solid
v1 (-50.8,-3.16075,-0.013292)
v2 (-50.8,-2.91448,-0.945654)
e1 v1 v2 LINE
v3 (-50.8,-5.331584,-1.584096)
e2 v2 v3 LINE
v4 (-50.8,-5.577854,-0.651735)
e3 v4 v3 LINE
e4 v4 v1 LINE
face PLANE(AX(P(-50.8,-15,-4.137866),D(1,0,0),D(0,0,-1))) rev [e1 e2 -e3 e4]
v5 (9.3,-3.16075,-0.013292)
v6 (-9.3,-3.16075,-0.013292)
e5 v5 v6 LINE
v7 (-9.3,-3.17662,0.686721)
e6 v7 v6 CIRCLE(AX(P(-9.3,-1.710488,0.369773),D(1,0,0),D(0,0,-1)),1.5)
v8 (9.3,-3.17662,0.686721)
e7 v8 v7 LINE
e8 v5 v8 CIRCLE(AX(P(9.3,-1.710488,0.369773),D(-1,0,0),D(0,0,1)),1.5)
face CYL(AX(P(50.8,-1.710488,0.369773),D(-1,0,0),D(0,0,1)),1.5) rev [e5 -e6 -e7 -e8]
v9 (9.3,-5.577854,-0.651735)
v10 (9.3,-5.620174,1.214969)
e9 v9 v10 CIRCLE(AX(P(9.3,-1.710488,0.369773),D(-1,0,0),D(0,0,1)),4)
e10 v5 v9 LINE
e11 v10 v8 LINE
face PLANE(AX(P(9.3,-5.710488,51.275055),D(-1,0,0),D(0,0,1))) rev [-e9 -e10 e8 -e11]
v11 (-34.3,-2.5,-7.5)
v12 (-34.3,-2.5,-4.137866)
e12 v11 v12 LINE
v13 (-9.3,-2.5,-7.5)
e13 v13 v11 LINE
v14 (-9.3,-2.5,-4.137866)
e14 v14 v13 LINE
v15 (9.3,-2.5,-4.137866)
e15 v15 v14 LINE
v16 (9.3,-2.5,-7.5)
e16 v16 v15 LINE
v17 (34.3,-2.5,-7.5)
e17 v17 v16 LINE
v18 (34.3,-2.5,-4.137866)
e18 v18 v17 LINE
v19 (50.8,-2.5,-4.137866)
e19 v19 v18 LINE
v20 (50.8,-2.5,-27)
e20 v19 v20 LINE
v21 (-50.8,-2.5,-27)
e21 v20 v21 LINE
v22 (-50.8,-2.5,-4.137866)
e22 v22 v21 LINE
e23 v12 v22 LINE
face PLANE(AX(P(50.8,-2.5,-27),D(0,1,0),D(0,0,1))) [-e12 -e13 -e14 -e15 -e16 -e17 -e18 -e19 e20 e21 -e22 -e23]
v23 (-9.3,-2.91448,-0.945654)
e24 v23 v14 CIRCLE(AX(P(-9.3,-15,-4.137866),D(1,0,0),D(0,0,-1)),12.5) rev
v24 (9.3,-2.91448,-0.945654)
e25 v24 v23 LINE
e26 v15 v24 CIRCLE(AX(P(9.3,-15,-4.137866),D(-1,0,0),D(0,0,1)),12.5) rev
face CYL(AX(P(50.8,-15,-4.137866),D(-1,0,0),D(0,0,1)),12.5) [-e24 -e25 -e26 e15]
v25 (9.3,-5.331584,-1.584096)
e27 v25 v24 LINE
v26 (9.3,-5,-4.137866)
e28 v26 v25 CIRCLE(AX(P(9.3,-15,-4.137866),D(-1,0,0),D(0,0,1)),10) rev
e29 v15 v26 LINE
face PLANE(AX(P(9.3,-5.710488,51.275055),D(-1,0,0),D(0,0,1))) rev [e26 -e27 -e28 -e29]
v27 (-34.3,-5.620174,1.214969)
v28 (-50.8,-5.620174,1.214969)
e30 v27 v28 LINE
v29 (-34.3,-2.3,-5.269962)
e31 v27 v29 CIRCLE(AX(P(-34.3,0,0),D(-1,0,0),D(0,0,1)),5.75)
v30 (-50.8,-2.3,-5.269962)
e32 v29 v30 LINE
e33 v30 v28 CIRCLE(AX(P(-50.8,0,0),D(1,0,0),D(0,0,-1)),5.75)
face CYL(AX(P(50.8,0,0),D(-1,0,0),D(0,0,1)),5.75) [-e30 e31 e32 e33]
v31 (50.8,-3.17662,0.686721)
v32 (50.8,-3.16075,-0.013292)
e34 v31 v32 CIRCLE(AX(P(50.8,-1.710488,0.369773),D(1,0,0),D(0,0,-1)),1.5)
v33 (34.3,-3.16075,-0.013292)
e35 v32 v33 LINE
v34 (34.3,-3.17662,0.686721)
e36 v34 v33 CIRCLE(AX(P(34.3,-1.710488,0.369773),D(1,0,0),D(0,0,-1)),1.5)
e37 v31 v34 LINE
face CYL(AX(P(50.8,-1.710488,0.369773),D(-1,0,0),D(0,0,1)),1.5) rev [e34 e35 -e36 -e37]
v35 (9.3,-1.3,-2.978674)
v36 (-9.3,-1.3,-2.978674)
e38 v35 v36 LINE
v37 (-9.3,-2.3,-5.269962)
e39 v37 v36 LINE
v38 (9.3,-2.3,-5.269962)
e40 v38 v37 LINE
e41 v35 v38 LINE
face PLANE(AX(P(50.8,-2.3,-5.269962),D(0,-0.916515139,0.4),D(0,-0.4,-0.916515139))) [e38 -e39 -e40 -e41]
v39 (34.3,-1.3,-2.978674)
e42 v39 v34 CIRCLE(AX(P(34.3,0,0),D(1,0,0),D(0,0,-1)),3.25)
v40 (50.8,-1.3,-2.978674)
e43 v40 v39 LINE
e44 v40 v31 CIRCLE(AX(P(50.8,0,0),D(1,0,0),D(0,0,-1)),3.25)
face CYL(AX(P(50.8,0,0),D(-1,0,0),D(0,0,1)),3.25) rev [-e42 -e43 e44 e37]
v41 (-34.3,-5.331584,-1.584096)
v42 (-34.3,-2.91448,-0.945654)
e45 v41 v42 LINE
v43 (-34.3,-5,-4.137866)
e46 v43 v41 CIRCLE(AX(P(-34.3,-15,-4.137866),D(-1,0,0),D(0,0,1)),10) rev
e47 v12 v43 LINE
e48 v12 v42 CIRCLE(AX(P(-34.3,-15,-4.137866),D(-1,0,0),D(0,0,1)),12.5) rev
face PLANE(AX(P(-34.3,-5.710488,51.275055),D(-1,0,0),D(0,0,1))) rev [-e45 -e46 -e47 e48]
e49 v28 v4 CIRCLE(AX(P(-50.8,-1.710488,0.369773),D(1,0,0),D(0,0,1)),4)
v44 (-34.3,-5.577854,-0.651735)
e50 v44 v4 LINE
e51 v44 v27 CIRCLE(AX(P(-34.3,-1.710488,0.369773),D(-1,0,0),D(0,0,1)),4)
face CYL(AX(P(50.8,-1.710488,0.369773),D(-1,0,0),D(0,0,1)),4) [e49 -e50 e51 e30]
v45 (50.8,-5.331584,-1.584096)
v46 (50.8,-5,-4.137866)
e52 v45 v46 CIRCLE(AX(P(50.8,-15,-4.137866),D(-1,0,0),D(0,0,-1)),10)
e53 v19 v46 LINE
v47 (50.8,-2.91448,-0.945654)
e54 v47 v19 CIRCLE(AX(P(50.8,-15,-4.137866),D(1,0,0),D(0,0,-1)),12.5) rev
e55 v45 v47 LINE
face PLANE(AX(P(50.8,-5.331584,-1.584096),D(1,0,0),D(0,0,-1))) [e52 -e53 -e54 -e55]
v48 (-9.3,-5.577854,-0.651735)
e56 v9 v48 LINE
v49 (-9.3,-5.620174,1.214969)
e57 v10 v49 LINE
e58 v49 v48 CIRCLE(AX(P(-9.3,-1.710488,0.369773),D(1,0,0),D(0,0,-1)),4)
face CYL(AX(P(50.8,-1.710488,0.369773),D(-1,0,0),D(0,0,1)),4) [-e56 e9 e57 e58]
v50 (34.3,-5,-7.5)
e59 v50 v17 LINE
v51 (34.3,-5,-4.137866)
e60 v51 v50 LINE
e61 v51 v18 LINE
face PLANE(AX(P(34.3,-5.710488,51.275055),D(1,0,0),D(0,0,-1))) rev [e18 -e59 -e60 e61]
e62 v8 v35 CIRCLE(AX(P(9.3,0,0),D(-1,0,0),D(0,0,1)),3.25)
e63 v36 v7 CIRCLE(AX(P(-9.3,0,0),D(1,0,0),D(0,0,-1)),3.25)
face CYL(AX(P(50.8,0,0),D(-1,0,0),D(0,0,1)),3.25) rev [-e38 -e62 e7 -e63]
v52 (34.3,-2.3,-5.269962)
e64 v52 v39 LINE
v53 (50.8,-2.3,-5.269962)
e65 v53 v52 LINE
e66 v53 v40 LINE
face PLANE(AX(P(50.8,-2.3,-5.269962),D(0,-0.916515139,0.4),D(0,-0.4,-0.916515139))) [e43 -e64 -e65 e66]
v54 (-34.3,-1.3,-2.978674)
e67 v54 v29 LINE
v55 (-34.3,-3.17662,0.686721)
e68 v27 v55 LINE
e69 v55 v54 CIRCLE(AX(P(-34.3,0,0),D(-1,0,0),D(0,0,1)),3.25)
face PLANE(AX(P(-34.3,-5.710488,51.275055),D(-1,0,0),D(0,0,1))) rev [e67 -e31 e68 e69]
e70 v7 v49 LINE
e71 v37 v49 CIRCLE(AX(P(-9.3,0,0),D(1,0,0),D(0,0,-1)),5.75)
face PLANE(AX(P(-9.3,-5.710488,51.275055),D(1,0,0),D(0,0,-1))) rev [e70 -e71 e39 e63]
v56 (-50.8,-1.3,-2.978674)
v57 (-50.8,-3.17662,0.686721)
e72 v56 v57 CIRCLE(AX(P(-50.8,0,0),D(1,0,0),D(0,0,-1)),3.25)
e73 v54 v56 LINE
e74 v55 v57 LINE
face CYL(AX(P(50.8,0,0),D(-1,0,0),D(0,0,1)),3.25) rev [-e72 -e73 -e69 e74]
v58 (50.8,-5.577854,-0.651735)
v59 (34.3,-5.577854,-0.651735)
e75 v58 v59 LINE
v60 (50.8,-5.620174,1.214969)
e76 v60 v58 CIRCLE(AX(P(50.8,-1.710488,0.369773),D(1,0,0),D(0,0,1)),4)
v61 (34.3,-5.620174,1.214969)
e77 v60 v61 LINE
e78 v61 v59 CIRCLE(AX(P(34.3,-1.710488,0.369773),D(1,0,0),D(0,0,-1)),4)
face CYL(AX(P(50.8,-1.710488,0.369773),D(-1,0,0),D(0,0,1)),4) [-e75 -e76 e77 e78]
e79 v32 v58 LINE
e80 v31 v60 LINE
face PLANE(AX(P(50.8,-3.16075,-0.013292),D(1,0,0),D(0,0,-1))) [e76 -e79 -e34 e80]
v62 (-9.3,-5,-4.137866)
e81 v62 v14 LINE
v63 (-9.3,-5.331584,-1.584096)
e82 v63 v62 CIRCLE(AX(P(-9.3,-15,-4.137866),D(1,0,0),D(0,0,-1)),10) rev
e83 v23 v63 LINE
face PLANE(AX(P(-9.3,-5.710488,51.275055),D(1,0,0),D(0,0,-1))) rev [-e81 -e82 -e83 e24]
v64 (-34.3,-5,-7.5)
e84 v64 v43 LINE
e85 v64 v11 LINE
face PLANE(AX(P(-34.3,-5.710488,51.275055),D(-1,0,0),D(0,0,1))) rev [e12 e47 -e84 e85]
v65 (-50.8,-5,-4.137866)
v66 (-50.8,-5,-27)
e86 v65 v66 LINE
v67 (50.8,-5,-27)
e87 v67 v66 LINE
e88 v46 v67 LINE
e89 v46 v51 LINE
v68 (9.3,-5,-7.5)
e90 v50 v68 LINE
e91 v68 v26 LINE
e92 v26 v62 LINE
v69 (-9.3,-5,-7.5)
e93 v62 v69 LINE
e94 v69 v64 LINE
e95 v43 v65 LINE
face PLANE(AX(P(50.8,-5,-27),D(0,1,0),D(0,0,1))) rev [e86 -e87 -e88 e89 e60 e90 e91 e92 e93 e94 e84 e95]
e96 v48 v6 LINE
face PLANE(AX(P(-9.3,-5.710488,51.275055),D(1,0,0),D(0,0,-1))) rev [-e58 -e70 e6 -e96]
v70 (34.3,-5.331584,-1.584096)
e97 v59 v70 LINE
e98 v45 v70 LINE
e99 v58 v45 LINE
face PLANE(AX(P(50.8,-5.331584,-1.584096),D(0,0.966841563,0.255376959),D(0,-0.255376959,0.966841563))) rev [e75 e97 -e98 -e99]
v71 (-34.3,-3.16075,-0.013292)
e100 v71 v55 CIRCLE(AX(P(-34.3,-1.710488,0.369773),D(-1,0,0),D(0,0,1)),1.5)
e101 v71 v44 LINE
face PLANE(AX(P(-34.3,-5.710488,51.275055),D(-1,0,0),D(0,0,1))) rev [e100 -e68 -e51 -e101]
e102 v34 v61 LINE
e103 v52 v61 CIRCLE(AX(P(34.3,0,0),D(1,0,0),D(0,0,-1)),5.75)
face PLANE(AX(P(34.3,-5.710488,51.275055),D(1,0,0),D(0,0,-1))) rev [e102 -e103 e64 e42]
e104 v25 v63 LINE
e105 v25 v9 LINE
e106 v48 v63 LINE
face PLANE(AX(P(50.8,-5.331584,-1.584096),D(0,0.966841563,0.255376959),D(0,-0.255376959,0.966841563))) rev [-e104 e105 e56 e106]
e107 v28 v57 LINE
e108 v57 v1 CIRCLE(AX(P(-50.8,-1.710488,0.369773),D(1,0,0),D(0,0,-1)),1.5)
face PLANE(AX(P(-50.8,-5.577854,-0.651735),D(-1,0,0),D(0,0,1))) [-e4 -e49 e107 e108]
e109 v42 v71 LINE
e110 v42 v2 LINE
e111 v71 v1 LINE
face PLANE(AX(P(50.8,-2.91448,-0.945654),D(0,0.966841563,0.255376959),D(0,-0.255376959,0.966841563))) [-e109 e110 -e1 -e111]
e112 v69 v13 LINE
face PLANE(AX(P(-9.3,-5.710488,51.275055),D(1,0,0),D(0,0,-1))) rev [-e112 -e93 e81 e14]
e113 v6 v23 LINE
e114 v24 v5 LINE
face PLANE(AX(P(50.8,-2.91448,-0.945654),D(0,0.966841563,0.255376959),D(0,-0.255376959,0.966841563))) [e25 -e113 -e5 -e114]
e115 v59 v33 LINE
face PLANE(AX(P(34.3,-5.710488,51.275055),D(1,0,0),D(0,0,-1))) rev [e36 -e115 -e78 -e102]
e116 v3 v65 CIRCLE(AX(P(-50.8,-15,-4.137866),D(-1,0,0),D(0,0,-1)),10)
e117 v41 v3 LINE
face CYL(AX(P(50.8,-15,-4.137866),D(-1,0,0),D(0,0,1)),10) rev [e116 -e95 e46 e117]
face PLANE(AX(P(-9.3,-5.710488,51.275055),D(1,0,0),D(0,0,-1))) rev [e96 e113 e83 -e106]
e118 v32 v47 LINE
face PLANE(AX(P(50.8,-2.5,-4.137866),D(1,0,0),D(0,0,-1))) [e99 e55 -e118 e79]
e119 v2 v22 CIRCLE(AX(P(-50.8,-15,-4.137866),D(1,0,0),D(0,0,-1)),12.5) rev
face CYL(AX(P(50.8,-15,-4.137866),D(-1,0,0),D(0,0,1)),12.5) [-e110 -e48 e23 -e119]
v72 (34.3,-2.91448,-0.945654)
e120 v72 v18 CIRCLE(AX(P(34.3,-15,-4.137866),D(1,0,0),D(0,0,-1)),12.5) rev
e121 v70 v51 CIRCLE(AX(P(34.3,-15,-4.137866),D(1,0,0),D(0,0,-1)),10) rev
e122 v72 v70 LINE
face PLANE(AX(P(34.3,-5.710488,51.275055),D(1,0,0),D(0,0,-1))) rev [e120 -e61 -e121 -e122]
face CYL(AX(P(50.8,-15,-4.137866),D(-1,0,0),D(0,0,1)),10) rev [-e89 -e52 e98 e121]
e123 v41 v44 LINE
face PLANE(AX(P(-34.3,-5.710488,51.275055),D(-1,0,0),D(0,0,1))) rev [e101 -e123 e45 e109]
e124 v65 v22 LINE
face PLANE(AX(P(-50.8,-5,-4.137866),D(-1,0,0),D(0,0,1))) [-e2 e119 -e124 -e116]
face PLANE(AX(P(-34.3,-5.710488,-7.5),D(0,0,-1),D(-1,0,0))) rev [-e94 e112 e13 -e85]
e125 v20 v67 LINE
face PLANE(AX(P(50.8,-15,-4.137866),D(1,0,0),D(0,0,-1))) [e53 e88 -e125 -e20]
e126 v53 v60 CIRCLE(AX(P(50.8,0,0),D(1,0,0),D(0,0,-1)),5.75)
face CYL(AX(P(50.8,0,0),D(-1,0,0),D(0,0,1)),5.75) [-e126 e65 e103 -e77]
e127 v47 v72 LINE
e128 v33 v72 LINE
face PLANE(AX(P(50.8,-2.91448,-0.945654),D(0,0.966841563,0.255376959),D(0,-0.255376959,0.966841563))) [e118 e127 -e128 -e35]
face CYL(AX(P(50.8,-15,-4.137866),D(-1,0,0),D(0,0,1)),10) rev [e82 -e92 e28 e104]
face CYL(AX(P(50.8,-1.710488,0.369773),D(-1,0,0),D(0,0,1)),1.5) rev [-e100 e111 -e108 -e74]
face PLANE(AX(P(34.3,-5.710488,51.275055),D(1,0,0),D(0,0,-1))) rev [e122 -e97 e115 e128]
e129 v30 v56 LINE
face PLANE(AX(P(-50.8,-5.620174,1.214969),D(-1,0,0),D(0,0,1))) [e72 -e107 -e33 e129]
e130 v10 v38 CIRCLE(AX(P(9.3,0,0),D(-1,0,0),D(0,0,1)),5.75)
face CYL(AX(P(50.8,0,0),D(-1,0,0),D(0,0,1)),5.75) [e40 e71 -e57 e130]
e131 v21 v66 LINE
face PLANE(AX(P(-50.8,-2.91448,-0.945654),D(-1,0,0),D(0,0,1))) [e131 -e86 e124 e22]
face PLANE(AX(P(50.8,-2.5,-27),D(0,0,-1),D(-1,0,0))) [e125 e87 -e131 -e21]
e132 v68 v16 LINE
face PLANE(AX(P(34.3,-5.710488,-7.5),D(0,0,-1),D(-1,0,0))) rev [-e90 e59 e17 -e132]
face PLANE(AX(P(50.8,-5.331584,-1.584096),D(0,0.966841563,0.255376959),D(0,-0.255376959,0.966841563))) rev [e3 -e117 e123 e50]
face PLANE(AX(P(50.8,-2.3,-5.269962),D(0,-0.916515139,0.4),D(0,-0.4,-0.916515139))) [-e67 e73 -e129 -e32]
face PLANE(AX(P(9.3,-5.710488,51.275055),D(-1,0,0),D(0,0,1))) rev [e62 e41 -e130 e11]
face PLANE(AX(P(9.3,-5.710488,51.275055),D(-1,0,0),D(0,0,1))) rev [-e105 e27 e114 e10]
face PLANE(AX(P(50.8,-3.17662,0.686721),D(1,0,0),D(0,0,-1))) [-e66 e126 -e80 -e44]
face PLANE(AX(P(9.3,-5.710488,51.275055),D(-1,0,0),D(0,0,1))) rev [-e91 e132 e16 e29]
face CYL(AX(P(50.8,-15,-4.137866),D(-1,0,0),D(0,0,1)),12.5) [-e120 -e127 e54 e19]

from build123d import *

# Parameters (mm, degrees)
BASE_FLANGE1_DEPTH      = 50.8
CUT_EXTRUDE1_DEPTH      = 58.816109347
CUT_EXTRUDE1_DEPTH_BACK = 58.816109347
SKETCH6_W               = 25
SKETCH6_H               = 58.775055245


# Sheet-metal steps are written as plain solids
with BuildPart() as part:
    # Sketch1 → Base-Flange1 (new, symmetric)
    with BuildSketch(Plane(origin=(0, 0, 0), x_dir=(0, 0, -1), z_dir=(1, 0, 0))):
        with BuildLine():
            Line((27, -5), (4.137865616, -5))
            ThreePointArc((4.137865616, -5), (2.850262482, -5.083242558), (1.584096024, -5.331584366))
            Line((1.584096024, -5.331584366), (0.651734752, -5.577853864))
            ThreePointArc((0.651734752, -5.577853864), (-0.279113067, -5.709460074), (-1.214968707, -5.620173577))
            ThreePointArc((-1.214968707, -5.620173577), (-2.620425709, 5.118190022), (5.269962049, -2.3))
            Line((5.269962049, -2.3), (2.978674202, -1.3))
            ThreePointArc((2.978674202, -1.3), (-1.481110183, 2.892890013), (-0.686721443, -3.176619848))
            ThreePointArc((-0.686721443, -3.176619848), (-0.335775578, -3.210102284), (0.013292354, -3.160749956))
            Line((0.013292354, -3.160749956), (0.945653625, -2.914480458))
            ThreePointArc((0.945653625, -2.914480458), (2.528361698, -2.604053197), (4.137865616, -2.5))
            Line((4.137865616, -2.5), (27, -2.5))
            Line((27, -2.5), (27, -5))
        make_face()
    extrude(amount=BASE_FLANGE1_DEPTH, both=True)

    # Sketch6 → Cut-Extrude1 (cut, two sides: drawn at the far end of the back side and taken through both)
    with BuildSketch(Plane(origin=(0, 0, 0), x_dir=(1, 0, 0), z_dir=(0, 1, 0)).offset(-CUT_EXTRUDE1_DEPTH_BACK)):
        with Locations((-21.8, -21.887527623)):
            Rectangle(SKETCH6_W, SKETCH6_H)
        with Locations((21.8, -21.887527623)):
            Rectangle(SKETCH6_W, SKETCH6_H)
    extrude(amount=CUT_EXTRUDE1_DEPTH + CUT_EXTRUDE1_DEPTH_BACK, mode=Mode.SUBTRACT)


solid = part.part
